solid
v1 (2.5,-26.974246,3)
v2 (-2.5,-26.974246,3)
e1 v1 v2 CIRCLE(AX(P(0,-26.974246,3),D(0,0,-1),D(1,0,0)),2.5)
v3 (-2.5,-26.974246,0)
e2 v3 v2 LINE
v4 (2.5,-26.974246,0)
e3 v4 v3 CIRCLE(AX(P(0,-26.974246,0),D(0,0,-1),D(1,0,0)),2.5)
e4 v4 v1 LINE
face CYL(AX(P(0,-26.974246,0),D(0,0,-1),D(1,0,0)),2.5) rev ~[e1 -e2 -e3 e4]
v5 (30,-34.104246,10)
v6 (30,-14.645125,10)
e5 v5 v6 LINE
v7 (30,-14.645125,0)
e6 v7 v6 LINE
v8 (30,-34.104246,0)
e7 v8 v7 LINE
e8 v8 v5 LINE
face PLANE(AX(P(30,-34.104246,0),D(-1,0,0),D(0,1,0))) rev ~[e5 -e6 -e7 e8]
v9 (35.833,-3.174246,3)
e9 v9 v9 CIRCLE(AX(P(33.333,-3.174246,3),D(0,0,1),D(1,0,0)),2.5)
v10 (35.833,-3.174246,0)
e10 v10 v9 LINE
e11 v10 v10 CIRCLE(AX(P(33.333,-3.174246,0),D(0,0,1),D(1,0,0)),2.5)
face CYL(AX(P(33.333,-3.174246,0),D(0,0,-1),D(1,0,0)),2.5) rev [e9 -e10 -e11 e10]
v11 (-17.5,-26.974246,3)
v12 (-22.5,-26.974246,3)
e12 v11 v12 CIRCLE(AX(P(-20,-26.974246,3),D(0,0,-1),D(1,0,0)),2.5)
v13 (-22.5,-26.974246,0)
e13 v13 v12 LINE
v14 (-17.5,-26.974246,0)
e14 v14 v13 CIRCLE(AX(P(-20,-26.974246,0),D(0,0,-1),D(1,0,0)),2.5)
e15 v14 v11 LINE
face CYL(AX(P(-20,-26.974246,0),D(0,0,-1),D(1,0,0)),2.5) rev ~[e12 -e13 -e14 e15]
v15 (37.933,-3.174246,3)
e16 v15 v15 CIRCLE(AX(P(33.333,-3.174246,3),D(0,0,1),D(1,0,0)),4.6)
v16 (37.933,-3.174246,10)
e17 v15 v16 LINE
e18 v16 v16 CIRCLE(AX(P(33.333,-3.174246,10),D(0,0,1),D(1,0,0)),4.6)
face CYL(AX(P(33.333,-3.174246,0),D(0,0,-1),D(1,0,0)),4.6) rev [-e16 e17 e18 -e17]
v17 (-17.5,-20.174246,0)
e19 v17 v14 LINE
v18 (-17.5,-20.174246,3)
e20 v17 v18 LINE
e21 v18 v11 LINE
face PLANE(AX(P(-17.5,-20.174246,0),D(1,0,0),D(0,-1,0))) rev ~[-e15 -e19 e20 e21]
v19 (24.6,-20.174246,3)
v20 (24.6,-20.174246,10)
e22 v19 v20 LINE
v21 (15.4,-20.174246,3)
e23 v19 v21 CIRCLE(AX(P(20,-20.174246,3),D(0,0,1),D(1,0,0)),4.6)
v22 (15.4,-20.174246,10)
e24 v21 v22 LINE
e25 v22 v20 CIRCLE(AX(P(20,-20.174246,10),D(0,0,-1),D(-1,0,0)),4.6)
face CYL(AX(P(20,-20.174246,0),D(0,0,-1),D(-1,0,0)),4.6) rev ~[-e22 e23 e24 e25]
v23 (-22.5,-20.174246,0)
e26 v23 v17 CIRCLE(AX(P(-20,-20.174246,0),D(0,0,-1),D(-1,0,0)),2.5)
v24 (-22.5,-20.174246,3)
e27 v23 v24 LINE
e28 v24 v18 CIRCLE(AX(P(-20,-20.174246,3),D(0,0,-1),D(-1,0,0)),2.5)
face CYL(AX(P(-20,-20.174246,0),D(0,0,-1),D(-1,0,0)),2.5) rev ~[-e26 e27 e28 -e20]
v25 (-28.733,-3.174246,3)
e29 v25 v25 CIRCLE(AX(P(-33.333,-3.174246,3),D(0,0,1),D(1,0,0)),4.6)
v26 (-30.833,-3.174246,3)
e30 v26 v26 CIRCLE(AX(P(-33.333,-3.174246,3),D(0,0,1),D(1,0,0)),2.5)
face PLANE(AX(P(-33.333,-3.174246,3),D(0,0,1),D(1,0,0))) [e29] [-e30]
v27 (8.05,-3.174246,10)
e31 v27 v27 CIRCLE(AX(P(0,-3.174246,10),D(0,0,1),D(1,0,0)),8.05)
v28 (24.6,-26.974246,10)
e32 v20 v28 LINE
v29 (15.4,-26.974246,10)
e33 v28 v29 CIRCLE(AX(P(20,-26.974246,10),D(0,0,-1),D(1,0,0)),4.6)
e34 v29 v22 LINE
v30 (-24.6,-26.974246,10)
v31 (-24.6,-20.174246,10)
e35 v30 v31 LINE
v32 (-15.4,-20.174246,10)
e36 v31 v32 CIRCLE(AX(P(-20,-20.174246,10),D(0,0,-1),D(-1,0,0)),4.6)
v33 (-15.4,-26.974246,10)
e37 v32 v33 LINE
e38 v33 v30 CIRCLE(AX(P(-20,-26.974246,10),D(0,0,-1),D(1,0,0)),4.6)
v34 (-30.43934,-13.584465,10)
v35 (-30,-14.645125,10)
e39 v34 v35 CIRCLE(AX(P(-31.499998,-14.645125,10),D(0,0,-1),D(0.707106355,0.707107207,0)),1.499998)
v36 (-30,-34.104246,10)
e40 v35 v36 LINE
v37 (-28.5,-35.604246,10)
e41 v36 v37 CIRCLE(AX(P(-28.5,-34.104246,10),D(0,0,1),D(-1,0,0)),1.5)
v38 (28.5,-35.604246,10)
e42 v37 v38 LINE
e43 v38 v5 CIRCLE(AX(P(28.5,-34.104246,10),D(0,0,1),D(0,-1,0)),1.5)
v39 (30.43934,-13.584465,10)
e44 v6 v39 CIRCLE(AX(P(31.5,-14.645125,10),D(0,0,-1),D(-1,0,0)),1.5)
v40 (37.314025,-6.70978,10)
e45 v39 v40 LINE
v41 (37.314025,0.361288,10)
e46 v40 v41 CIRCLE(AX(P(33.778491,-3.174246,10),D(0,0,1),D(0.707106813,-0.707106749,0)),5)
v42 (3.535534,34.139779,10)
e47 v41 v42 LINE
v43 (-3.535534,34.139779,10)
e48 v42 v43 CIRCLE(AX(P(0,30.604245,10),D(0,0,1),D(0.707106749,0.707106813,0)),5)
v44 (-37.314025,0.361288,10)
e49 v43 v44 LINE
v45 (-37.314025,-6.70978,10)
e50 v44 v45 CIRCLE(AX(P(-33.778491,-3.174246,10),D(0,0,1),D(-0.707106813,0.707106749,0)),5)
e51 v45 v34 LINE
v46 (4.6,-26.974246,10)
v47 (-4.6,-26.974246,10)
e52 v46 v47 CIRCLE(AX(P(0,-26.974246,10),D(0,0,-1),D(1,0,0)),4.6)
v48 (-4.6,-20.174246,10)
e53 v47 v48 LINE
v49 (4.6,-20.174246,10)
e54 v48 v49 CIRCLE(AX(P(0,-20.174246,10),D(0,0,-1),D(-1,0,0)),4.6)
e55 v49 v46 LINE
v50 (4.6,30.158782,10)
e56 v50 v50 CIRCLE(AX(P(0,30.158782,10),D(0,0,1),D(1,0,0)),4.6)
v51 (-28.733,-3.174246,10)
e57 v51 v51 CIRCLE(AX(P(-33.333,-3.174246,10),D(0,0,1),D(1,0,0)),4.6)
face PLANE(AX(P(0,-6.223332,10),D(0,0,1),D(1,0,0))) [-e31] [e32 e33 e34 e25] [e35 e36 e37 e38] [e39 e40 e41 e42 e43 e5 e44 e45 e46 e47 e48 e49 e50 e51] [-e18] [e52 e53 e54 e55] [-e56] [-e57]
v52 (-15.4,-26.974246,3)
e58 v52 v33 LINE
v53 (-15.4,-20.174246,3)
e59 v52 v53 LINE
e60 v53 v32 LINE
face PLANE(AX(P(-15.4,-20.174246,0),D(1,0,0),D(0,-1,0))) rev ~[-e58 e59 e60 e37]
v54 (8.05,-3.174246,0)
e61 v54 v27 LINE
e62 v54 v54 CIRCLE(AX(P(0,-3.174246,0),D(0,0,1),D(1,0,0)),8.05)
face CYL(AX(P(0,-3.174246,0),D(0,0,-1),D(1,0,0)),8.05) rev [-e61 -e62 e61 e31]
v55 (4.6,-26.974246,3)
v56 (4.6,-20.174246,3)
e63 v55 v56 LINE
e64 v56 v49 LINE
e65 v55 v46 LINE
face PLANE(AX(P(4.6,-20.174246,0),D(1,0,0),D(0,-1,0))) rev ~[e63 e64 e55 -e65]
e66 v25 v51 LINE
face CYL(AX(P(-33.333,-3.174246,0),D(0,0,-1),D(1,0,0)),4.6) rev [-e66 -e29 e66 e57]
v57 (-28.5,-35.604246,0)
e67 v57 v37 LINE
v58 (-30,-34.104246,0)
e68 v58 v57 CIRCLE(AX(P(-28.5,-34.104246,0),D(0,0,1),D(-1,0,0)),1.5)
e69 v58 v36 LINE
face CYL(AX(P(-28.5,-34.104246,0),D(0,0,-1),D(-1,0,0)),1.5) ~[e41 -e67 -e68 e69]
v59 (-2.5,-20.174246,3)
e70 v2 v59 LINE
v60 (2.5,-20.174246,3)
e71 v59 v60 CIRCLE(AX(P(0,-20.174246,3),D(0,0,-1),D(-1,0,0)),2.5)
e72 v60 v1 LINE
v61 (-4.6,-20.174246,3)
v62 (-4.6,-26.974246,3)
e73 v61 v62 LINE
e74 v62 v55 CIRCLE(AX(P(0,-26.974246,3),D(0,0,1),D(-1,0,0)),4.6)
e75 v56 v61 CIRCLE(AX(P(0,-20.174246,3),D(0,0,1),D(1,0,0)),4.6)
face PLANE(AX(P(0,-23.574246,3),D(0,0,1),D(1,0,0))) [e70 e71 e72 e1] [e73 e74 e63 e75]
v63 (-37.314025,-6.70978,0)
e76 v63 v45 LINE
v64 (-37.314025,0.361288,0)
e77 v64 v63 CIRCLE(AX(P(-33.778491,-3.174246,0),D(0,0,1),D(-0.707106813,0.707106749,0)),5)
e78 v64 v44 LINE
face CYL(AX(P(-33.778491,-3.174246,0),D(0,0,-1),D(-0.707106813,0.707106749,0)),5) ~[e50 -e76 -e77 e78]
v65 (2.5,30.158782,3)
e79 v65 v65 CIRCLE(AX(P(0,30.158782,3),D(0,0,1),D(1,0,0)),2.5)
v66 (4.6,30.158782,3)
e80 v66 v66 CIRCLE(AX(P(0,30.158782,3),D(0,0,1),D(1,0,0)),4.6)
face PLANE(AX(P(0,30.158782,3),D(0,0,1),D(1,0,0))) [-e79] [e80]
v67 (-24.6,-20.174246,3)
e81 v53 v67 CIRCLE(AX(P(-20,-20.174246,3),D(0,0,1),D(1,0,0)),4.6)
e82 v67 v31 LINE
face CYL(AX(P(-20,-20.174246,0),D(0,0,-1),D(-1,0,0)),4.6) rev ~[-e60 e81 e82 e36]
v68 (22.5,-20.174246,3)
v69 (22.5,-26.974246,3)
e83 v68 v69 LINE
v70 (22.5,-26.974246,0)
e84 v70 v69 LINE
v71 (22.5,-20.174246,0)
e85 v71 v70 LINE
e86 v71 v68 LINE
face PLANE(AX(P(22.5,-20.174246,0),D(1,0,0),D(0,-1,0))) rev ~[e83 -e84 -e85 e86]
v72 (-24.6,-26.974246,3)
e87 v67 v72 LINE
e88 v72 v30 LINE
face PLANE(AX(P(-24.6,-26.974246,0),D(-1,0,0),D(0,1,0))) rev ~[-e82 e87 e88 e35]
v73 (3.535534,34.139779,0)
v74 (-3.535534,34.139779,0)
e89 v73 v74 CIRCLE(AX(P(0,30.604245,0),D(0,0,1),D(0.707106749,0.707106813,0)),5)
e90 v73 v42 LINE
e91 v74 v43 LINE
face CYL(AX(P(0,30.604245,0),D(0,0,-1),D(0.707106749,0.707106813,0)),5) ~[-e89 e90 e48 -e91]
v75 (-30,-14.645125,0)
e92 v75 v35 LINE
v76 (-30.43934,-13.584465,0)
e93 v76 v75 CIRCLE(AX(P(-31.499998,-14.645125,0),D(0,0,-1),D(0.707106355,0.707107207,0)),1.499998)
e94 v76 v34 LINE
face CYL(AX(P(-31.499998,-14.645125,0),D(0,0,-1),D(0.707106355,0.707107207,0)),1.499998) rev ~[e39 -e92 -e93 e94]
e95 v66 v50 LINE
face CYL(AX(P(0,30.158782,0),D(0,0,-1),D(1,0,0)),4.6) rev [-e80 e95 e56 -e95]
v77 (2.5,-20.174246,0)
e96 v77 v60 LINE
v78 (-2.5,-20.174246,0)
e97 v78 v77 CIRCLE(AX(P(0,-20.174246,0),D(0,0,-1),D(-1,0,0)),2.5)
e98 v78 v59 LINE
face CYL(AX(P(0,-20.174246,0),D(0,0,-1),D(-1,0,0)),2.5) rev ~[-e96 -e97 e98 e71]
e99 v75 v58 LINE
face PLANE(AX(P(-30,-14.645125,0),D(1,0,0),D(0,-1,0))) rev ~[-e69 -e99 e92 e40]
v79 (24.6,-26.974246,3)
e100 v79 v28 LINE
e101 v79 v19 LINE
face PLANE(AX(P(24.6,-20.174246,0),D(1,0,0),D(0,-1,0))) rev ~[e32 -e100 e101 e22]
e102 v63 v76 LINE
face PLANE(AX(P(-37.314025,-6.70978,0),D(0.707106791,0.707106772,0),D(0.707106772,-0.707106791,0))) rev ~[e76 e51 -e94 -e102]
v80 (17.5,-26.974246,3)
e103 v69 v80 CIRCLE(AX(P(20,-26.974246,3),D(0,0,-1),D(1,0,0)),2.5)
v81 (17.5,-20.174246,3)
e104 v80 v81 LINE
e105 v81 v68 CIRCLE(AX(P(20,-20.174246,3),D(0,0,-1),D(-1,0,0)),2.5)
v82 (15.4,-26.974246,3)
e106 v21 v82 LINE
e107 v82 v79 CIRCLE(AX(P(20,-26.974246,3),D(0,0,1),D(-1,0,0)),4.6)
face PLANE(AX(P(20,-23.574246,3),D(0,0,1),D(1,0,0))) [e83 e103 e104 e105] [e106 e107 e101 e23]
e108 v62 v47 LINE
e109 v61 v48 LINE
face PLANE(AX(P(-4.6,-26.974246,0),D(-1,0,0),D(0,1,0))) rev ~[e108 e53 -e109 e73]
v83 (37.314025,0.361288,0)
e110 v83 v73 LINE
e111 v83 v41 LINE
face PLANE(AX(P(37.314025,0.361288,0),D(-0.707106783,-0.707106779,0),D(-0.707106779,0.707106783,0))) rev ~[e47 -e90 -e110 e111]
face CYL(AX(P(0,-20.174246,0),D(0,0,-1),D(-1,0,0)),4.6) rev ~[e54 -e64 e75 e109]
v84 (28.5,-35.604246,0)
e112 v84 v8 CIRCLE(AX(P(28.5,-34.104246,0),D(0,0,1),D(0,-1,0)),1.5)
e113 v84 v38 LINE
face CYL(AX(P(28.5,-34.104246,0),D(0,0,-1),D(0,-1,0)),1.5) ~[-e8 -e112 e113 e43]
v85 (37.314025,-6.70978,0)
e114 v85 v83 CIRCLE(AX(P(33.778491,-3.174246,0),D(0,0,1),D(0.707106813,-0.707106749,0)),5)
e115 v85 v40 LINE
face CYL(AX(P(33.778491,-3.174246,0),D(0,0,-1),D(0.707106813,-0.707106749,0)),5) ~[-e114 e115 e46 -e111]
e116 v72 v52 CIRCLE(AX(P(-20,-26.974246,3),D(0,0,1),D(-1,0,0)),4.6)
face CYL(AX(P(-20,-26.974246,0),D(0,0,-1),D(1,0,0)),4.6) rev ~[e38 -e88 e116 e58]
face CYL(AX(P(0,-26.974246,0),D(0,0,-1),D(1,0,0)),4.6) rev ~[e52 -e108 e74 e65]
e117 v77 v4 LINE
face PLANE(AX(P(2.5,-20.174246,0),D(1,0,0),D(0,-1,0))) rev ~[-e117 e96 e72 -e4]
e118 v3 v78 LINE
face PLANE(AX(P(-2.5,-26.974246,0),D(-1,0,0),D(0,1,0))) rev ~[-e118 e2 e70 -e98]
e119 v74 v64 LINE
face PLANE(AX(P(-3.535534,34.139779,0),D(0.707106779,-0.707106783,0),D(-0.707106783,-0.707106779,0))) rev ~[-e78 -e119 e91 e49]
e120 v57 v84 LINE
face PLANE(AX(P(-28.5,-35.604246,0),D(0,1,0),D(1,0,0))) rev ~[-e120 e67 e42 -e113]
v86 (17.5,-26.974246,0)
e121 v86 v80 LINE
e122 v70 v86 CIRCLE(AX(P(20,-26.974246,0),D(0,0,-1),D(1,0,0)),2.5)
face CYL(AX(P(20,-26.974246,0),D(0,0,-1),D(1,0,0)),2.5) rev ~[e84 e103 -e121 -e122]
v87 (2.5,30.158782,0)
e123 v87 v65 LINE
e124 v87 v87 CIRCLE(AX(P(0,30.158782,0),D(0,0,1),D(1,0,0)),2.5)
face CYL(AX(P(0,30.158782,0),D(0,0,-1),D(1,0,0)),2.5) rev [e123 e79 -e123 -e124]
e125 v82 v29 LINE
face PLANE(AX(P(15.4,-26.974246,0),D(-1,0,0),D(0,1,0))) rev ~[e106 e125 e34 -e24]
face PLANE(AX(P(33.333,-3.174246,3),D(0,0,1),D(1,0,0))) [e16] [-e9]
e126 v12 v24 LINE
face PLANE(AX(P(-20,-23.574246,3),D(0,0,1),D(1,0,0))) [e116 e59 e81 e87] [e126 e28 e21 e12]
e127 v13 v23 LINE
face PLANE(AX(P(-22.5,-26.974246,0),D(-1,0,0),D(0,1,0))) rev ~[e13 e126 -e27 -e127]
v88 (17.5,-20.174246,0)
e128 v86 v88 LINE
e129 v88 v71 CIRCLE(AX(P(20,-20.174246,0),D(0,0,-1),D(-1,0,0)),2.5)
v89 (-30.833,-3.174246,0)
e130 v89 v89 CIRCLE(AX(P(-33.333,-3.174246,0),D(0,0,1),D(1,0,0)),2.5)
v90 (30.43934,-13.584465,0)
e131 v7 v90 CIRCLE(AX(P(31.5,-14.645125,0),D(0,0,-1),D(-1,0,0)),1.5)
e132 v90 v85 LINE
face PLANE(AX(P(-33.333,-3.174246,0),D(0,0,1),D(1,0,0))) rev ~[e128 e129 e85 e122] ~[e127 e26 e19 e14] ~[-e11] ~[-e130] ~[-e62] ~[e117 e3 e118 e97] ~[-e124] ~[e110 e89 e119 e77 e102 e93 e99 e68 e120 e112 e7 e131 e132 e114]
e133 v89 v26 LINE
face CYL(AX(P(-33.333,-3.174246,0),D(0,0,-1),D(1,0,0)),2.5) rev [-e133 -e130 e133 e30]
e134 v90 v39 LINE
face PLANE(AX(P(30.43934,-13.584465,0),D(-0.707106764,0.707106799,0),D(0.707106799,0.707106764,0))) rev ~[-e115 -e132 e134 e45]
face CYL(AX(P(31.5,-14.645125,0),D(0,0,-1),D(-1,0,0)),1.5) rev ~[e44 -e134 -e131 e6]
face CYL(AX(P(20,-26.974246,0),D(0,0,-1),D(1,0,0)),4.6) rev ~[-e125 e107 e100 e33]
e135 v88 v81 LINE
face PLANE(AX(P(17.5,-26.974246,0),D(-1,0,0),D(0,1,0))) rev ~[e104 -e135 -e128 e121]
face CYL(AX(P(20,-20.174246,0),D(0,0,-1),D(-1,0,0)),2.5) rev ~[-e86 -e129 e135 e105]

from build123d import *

# Parameters (mm, degrees)
F0_R     = 4.6
F0_R_2   = 8.05
F1_DEPTH = 10
F0_R_3   = 2.5
F2_DEPTH = 3


# Not quite as in the source:
# - ends of sketch curves that miss each other by under 0.0002 mm in the source are joined


with BuildPart() as f1:
    # F0 (on Top) → F1 (new body)
    with BuildSketch(Plane.XY):
        with BuildLine():
            ThreePointArc((-30, -34.104246), (-29.5606601718, -35.1649061718), (-28.5, -35.604246))
            Line((-28.5, -35.604246), (28.5, -35.604246))
            ThreePointArc((28.5, -35.604246), (29.5606601718, -35.1649061718), (30, -34.104246))
            Line((30, -34.104246), (30, -14.645125))
            ThreePointArc((30, -14.645125), (30.1141807012, -14.0710998515), (30.4393398282, -13.5844648282))
            Line((30.4393398282, -13.5844648282), (37.314025, -6.70978))
            ThreePointArc((37.314025, -6.70978), (38.778491, -3.174246), (37.3140249059, 0.3612879059))
            Line((37.3140249059, 0.3612879059), (3.535534, 34.139779))
            ThreePointArc((3.535534, 34.139779), (0, 35.604245), (-3.5355339059, 34.1397789059))
            Line((-3.5355339059, 34.1397789059), (-37.314025, 0.361288))
            ThreePointArc((-37.314025, 0.361288), (-38.778491, -3.174246), (-37.3140249059, -6.7097799059))
            Line((-37.3140249059, -6.7097799059), (-30.43934, -13.584465))
            ThreePointArc((-30.43934, -13.584465), (-30.1141807012, -14.0710998515), (-30, -14.645125))
            Line((-30, -14.645125), (-30, -34.104246))
        make_face()
        with BuildLine():
            ThreePointArc((-24.6, -20.174246), (-20, -15.574246), (-15.4, -20.174246))
            Line((-15.4, -20.174246), (-15.4, -26.974246))
            ThreePointArc((-15.4, -26.974246), (-20, -31.574246), (-24.6, -26.974246))
            Line((-24.6, -26.974246), (-24.6, -20.174246))
        make_face(mode=Mode.SUBTRACT)
        with Locations((-33.333, -3.174246)):
            Circle(F0_R, mode=Mode.SUBTRACT)
        with BuildLine():
            ThreePointArc((4.6, -26.974246), (0, -31.574246), (-4.6, -26.974246))
            Line((-4.6, -26.974246), (-4.6, -20.174246))
            ThreePointArc((-4.6, -20.174246), (0, -15.574246), (4.6, -20.174246))
            Line((4.6, -20.174246), (4.6, -26.974246))
        make_face(mode=Mode.SUBTRACT)
        with BuildLine():
            ThreePointArc((24.6, -26.974246), (20, -31.574246), (15.4, -26.974246))
            Line((15.4, -26.974246), (15.4, -20.174246))
            ThreePointArc((15.4, -20.174246), (20, -15.574246), (24.6, -20.174246))
            Line((24.6, -20.174246), (24.6, -26.974246))
        make_face(mode=Mode.SUBTRACT)
        with Locations((0, -3.174246)):
            Circle(F0_R_2, mode=Mode.SUBTRACT)
        with Locations((33.333, -3.174246)):
            Circle(F0_R, mode=Mode.SUBTRACT)
        with Locations((0, 30.158782)):
            Circle(F0_R, mode=Mode.SUBTRACT)
    extrude(amount=F1_DEPTH)

    # F0 (on Top) → F2 (join)
    with BuildSketch(Plane.XY):
        with Locations((-33.333, -3.174246)):
            Circle(F0_R)
        with Locations((-33.333, -3.174246)):
            Circle(F0_R_3, mode=Mode.SUBTRACT)
        with BuildLine():
            Line((-15.4, -26.974246), (-15.4, -20.174246))
            ThreePointArc((-15.4, -20.174246), (-20, -15.574246), (-24.6, -20.174246))
            Line((-24.6, -20.174246), (-24.6, -26.974246))
            ThreePointArc((-24.6, -26.974246), (-20, -31.574246), (-15.4, -26.974246))
        make_face()
        with BuildLine():
            ThreePointArc((-17.5, -26.974246), (-20, -29.474246), (-22.5, -26.974246))
            Line((-22.5, -26.974246), (-22.5, -20.174246))
            ThreePointArc((-22.5, -20.174246), (-20, -17.674246), (-17.5, -20.174246))
            Line((-17.5, -20.174246), (-17.5, -26.974246))
        make_face(mode=Mode.SUBTRACT)
        with BuildLine():
            Line((-4.6, -20.174246), (-4.6, -26.974246))
            ThreePointArc((-4.6, -26.974246), (0, -31.574246), (4.6, -26.974246))
            Line((4.6, -26.974246), (4.6, -20.174246))
            ThreePointArc((4.6, -20.174246), (0, -15.574246), (-4.6, -20.174246))
        make_face()
        with BuildLine():
            ThreePointArc((2.5, -26.974246), (0, -29.474246), (-2.5, -26.974246))
            Line((-2.5, -26.974246), (-2.5, -20.174246))
            ThreePointArc((-2.5, -20.174246), (0, -17.674246), (2.5, -20.174246))
            Line((2.5, -20.174246), (2.5, -26.974246))
        make_face(mode=Mode.SUBTRACT)
        with BuildLine():
            Line((15.4, -20.174246), (15.4, -26.974246))
            ThreePointArc((15.4, -26.974246), (20, -31.574246), (24.6, -26.974246))
            Line((24.6, -26.974246), (24.6, -20.174246))
            ThreePointArc((24.6, -20.174246), (20, -15.574246), (15.4, -20.174246))
        make_face()
        with BuildLine():
            ThreePointArc((22.5, -26.974246), (20, -29.474246), (17.5, -26.974246))
            Line((17.5, -26.974246), (17.5, -20.174246))
            ThreePointArc((17.5, -20.174246), (20, -17.674246), (22.5, -20.174246))
            Line((22.5, -20.174246), (22.5, -26.974246))
        make_face(mode=Mode.SUBTRACT)
        with Locations((33.333, -3.174246)):
            Circle(F0_R)
        with Locations((33.333, -3.174246)):
            Circle(F0_R_3, mode=Mode.SUBTRACT)
        with Locations((0, 30.158782)):
            Circle(F0_R)
        with Locations((0, 30.158782)):
            Circle(F0_R_3, mode=Mode.SUBTRACT)
    extrude(amount=F2_DEPTH)


solid = f1.part
